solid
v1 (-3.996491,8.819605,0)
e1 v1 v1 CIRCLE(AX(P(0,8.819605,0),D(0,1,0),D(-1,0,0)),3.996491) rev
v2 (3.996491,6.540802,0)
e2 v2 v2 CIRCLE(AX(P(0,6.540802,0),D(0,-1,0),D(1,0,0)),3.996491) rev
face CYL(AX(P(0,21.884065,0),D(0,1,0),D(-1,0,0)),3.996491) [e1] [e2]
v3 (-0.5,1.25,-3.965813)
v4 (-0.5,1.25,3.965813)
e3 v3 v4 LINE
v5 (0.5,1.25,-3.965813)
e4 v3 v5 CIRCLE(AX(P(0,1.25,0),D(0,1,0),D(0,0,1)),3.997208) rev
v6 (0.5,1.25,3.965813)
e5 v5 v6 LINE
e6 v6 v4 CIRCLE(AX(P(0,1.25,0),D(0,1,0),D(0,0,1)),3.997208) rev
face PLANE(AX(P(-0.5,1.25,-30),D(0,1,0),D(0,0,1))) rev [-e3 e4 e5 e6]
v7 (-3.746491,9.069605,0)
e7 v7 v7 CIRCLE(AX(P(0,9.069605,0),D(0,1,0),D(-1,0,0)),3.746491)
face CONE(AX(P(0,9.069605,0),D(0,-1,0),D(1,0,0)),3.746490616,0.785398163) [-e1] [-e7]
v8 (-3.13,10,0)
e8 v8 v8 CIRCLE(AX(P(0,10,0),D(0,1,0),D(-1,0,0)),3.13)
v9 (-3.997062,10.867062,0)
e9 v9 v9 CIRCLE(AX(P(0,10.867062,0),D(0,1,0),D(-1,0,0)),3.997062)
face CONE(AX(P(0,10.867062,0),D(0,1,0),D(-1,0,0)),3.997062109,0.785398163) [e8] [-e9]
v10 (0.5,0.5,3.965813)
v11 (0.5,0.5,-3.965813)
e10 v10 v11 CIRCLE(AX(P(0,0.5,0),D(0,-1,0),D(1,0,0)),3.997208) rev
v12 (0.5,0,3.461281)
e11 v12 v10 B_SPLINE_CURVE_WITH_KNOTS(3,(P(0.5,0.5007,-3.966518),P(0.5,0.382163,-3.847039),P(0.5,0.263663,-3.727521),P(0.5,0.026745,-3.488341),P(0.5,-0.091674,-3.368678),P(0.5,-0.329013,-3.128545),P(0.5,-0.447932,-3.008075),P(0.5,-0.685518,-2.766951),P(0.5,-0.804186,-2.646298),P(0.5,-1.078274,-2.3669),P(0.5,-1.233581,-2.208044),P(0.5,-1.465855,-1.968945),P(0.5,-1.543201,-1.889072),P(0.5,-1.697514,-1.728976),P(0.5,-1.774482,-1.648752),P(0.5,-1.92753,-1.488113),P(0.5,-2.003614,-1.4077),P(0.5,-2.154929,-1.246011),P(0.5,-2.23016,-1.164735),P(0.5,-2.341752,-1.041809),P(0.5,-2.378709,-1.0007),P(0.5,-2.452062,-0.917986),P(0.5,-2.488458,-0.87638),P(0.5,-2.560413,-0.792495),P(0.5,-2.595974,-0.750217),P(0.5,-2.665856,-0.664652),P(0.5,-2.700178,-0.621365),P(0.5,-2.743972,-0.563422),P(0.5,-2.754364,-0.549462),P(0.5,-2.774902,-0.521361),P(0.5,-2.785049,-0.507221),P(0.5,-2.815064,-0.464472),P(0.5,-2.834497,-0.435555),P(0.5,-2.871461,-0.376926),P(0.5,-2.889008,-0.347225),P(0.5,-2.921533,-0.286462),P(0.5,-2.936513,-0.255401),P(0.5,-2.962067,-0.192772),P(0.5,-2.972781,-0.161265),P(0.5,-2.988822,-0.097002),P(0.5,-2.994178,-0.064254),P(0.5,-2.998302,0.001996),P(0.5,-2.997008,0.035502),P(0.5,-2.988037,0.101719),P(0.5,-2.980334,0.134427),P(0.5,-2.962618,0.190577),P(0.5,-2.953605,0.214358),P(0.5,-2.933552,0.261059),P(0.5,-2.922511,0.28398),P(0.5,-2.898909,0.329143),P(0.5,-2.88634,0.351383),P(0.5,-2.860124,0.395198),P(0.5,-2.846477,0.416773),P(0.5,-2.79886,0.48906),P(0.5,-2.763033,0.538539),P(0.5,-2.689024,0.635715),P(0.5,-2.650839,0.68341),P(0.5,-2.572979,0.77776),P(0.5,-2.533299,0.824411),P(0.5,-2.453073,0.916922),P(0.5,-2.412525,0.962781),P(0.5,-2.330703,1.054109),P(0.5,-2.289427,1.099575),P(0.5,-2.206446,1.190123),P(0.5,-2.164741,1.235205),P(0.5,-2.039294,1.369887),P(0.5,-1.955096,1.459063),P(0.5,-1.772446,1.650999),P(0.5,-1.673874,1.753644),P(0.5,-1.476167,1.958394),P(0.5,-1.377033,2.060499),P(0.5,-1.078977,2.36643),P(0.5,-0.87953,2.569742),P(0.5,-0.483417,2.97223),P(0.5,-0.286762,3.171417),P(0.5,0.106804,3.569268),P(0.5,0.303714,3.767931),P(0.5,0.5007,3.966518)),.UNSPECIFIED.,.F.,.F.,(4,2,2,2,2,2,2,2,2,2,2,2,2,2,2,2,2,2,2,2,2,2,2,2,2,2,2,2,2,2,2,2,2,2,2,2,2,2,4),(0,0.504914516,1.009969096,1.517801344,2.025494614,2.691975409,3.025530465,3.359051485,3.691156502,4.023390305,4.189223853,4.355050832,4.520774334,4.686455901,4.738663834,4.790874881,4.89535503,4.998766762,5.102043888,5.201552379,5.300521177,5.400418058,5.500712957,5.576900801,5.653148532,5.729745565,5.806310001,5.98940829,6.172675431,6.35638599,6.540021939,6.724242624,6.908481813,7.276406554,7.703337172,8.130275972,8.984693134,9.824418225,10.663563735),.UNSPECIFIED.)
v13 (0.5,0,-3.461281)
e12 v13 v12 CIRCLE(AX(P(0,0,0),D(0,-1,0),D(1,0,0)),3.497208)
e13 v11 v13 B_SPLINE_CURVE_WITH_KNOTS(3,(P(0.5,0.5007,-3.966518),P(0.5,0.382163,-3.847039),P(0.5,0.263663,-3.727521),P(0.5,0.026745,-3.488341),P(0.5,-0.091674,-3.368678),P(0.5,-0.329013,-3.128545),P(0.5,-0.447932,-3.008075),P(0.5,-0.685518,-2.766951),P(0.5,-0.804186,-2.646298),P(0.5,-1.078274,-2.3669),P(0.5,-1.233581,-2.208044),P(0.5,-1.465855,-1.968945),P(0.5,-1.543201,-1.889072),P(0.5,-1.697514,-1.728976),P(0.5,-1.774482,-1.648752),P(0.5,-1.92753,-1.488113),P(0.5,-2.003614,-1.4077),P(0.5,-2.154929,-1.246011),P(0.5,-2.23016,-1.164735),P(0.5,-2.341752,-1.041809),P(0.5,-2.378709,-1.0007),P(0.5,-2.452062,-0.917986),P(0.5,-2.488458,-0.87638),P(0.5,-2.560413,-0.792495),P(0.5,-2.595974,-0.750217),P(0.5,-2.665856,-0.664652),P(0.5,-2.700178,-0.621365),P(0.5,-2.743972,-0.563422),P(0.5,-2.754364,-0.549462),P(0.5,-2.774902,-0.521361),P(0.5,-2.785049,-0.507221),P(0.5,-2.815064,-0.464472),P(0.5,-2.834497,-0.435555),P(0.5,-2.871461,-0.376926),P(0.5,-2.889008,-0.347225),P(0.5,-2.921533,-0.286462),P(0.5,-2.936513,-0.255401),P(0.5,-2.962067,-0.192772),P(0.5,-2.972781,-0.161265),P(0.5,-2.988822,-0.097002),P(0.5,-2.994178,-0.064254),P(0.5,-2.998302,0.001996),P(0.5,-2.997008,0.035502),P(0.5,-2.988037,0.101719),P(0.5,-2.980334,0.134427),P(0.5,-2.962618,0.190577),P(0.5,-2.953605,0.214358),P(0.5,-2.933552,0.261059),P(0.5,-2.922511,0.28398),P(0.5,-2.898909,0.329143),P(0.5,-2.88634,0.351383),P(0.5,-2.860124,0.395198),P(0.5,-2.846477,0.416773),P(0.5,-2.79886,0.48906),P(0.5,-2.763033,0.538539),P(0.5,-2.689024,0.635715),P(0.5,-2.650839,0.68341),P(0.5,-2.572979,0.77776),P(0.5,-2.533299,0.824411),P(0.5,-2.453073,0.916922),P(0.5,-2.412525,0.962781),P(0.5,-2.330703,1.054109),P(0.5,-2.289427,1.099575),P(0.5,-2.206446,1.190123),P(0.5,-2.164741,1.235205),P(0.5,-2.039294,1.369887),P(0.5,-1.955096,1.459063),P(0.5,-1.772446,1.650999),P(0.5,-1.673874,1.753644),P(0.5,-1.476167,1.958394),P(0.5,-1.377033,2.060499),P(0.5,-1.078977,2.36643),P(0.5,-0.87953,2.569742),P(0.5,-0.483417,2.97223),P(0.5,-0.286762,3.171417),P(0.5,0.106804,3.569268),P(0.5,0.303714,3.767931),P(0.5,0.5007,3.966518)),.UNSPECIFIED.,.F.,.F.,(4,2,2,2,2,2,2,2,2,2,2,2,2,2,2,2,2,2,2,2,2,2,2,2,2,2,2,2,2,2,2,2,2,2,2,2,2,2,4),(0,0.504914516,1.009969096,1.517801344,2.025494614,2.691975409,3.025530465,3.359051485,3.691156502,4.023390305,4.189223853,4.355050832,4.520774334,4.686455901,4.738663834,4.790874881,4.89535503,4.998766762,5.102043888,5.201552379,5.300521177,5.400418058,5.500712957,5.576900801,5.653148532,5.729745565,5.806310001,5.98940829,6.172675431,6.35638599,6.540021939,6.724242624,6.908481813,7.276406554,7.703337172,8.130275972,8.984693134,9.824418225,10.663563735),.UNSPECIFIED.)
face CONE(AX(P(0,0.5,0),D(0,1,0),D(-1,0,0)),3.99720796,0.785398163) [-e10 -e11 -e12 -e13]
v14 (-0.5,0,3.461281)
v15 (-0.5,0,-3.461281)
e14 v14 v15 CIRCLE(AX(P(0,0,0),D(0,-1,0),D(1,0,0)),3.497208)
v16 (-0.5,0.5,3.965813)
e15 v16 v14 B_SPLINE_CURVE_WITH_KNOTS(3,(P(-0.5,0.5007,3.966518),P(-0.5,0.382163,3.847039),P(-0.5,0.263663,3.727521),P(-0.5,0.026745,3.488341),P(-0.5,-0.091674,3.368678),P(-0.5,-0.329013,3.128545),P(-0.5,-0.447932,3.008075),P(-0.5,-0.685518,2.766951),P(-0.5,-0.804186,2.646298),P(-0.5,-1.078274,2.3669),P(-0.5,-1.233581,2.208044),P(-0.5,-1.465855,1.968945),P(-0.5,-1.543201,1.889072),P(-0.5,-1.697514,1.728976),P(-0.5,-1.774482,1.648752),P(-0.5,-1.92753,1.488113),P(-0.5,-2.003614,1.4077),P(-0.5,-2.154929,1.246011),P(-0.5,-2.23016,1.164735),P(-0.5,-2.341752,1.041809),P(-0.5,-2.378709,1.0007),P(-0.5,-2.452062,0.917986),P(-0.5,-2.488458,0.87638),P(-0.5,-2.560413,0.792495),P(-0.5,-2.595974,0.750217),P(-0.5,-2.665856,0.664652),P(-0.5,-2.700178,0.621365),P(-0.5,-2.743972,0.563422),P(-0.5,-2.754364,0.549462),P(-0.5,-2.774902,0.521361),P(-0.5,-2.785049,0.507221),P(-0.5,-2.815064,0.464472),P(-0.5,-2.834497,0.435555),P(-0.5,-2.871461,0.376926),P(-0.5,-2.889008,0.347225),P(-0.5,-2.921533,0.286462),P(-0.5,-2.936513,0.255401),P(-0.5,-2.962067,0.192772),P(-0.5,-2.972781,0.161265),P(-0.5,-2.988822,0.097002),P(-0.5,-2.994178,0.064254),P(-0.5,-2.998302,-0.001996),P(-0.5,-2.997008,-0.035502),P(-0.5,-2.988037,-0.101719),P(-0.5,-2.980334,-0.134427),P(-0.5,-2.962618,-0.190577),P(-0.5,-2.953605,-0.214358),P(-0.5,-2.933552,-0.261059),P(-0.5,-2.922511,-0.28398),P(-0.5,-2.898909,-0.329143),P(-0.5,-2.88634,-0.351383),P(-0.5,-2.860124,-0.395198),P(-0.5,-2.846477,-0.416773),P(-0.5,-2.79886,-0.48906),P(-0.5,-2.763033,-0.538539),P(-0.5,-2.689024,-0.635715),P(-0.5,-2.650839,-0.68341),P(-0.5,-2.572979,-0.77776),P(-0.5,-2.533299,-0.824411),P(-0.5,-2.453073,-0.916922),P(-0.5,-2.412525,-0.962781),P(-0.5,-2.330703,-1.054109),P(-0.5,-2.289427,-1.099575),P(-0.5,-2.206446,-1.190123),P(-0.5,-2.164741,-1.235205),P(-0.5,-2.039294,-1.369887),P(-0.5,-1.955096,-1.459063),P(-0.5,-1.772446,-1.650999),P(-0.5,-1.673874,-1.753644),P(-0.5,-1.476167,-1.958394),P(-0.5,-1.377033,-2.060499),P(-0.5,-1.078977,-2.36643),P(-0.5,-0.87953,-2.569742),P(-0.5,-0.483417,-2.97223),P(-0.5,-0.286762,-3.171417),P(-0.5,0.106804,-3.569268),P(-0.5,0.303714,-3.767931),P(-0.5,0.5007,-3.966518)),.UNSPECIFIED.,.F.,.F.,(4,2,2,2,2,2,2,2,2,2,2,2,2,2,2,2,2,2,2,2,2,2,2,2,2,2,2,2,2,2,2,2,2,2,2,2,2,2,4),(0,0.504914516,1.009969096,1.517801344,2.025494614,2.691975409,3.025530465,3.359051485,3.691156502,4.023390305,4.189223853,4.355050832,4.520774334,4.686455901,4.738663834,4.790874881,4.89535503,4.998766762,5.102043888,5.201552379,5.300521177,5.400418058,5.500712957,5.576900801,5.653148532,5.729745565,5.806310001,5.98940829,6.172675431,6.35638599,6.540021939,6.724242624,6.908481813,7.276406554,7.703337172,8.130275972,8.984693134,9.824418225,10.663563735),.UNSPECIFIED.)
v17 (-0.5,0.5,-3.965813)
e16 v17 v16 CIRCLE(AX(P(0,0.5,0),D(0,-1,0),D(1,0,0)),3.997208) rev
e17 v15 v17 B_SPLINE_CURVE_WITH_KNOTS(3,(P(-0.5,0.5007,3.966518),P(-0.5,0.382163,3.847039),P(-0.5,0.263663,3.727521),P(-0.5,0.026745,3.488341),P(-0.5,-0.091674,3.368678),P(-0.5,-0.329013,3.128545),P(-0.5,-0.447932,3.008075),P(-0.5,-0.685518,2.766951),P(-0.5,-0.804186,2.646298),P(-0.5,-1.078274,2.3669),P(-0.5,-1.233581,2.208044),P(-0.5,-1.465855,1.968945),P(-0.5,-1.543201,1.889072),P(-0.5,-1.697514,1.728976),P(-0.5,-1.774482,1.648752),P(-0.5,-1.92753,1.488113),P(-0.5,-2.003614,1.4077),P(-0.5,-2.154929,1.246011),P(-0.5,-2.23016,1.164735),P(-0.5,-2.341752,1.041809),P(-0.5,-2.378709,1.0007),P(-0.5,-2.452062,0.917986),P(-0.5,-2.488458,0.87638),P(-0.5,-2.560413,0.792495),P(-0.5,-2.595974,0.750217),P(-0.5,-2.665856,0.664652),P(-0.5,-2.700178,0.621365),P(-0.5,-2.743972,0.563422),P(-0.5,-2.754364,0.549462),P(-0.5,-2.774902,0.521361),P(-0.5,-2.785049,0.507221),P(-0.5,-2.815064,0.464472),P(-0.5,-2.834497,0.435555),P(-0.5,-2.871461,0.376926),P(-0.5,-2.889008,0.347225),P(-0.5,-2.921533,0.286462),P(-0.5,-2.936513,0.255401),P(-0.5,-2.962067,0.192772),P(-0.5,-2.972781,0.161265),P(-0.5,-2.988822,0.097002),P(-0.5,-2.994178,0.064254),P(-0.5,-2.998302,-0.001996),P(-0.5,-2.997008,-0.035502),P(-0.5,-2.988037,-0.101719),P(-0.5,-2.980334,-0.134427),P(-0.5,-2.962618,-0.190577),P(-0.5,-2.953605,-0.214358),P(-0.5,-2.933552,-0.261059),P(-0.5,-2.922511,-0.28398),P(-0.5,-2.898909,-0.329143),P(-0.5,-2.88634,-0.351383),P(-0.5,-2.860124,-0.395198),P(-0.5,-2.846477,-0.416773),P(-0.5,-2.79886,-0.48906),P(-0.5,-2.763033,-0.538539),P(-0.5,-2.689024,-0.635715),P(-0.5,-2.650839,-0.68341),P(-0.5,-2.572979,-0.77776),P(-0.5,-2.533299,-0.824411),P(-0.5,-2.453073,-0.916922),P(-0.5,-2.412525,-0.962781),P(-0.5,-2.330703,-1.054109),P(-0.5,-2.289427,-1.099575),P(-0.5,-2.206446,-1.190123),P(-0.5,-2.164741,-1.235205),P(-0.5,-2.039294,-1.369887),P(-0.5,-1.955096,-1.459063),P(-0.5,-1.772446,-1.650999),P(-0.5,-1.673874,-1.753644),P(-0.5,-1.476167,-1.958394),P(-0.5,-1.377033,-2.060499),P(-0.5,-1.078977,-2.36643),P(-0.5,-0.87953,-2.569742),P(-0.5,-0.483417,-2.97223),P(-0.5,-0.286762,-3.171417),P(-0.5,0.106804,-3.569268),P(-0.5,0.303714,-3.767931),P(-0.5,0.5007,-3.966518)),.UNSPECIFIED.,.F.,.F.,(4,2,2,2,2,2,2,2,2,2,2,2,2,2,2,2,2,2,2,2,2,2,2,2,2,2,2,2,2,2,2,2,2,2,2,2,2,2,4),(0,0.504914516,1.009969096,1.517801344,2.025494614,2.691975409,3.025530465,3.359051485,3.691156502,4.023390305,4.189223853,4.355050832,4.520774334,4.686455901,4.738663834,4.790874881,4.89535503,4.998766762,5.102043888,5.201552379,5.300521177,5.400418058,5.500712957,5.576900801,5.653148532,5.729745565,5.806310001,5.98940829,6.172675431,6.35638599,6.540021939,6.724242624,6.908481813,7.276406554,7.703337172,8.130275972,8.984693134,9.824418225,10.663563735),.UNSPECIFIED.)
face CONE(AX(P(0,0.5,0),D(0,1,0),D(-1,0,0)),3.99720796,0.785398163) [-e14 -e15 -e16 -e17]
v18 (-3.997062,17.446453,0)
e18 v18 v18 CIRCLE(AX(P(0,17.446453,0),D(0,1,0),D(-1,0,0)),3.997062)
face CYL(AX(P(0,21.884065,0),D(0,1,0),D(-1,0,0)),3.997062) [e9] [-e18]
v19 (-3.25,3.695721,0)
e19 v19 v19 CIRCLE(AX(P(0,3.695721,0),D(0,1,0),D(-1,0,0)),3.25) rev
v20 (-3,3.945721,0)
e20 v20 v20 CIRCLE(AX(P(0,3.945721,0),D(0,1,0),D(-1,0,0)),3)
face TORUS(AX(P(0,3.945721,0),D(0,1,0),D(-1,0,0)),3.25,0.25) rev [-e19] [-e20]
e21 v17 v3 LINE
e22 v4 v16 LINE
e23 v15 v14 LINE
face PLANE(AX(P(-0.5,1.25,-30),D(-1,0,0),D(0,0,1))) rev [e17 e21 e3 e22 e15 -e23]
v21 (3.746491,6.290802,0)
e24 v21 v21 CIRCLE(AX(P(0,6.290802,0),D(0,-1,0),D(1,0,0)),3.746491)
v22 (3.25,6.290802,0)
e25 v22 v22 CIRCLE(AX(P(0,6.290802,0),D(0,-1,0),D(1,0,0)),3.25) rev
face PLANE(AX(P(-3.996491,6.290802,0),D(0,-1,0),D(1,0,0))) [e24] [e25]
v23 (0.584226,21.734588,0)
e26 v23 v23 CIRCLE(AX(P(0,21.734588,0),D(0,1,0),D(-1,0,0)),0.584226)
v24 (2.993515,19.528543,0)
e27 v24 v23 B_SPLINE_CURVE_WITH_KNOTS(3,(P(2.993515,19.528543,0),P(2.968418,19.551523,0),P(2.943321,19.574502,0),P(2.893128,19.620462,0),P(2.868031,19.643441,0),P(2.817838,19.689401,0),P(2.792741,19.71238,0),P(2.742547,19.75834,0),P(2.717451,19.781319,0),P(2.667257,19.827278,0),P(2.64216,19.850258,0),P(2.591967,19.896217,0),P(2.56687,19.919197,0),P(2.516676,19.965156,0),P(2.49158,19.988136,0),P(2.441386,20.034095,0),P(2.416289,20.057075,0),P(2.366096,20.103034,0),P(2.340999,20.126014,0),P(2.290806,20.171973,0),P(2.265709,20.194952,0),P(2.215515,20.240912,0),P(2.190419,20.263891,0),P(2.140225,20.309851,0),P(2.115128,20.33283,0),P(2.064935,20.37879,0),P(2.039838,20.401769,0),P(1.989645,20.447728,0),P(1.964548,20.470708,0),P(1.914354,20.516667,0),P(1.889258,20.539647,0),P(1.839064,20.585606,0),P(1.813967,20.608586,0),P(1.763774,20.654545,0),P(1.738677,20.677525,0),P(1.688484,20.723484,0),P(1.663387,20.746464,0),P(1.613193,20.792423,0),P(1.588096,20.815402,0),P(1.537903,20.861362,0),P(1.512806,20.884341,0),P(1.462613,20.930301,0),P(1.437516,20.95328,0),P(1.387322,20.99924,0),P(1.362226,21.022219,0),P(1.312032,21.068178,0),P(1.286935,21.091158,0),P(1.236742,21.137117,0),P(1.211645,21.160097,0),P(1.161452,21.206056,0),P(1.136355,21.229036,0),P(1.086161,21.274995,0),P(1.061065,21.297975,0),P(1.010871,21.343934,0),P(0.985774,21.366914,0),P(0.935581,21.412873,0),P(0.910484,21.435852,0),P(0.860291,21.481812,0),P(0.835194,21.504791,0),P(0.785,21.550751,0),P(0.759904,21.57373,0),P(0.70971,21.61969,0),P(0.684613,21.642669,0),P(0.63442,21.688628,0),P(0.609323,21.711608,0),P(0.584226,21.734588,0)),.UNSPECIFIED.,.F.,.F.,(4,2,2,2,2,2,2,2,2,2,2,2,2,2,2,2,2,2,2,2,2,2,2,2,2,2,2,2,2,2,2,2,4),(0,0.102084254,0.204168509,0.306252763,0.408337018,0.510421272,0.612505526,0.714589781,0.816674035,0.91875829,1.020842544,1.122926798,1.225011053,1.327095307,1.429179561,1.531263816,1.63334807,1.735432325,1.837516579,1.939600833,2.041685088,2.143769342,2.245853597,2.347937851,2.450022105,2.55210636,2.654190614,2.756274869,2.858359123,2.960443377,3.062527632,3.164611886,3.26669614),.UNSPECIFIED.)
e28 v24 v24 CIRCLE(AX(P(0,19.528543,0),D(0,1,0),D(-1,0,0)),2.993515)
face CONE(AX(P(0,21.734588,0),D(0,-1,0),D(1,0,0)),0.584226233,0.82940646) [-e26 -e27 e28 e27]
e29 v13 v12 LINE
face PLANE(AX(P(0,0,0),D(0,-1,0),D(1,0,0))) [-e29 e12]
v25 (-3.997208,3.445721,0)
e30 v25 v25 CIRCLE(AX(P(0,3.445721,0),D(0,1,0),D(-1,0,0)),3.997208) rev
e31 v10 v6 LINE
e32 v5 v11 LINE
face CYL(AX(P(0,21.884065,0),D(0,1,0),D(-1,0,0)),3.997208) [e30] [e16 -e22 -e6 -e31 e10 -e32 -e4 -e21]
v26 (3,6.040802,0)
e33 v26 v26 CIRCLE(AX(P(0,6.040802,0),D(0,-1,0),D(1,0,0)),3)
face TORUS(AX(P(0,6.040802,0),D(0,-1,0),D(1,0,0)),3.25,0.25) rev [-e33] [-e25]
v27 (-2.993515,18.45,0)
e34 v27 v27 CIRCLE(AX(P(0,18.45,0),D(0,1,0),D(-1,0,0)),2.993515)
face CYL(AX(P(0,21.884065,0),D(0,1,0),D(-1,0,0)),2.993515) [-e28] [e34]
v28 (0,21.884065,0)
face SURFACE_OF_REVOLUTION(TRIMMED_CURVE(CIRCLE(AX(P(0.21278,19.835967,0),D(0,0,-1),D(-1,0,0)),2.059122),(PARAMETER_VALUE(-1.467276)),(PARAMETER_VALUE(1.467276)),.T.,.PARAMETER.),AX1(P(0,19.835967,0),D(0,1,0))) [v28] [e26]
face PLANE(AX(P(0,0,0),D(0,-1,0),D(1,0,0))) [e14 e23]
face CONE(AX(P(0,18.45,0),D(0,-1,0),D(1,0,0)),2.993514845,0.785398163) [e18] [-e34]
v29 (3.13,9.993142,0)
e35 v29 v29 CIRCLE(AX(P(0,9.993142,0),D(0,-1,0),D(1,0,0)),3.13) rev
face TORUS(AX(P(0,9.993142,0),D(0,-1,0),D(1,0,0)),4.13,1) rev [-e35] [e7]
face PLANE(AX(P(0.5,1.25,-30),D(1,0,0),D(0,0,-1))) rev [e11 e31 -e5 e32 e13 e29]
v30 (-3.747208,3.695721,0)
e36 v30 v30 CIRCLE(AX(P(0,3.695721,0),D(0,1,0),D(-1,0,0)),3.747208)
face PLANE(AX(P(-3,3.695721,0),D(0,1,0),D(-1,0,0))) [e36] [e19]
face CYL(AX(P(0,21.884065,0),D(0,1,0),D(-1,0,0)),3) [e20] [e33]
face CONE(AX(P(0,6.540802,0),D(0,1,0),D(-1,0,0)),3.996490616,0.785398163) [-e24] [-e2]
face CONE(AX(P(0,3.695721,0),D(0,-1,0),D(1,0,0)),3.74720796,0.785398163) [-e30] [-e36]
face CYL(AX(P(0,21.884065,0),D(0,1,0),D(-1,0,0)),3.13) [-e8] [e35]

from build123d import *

# Parameters (mm, degrees)
REDONDEO1_R           = 0.25
CHAFL_N7_SIZE         = 0.25
CHAFL_N9_SIZE         = 0.5
CROQUIS1_W            = 1
CROQUIS1_H            = 1.25
CORTAR_EXTRUIR1_DEPTH = 40
REDONDEO2_R           = 1


with BuildPart() as part:
    # Sketch1 → Revolve1 (revolve)
    with BuildSketch(Plane.XY):
        with BuildLine():
            Line((0, 0), (-3.99720796, 0))
            Line((-3.99720796, 0), (-3.99720796, 3.695721343))
            Line((-3.99720796, 3.695721343), (-3, 3.695721343))
            Line((-3, 3.695721343), (-3, 6.290801943))
            Line((-3, 6.290801943), (-3.996490616, 6.290801943))
            Line((-3.996490616, 6.290801943), (-3.996490616, 9.069605063))
            Line((-3.996490616, 9.069605063), (-3.13, 9.069605063))
            Line((-3.13, 9.069605063), (-3.13, 10))
            Line((-3.13, 10), (-3.997062109, 10.867062109))
            Line((-3.997062109, 10.867062109), (-3.997062109, 17.446452736))
            Line((-3.997062109, 17.446452736), (-2.993514845, 18.45))
            Line((-2.993514845, 18.45), (-2.993514845, 19.528543236))
            Line((-2.993514845, 19.528543236), (-0.584226233, 21.734587674))
            ThreePointArc((-0.584226233, 21.734587674), (-0.297614848, 21.830829517), (0, 21.884064665))
            Line((0, 21.884064665), (0, 0))
        make_face()
    revolve(axis=Axis((0, 21.884064665, 0), (0, -1, 0)))

    # Redondeo1
    redondeo1_edges = [part.edges().sort_by_distance(p)[0] for p in [
        (3, 6.290801943, 0),
        (3, 3.695721343, 0),
    ]]
    fillet(redondeo1_edges, radius=REDONDEO1_R)

    # Chaflán7
    chafl_n7_edges = [part.edges().sort_by_distance(p)[0] for p in [
        (3.996490616, 9.069605063, 0),
        (3.996490616, 6.290801943, 0),
        (3.99720796, 3.695721343, 0),
    ]]
    chamfer(chafl_n7_edges, length=CHAFL_N7_SIZE)

    # Chaflán9
    chafl_n9_edges = [part.edges().sort_by_distance(p)[0] for p in [
        (3.99720796, 0, 0),
    ]]
    chamfer(chafl_n9_edges, length=CHAFL_N9_SIZE)

    # Croquis1 → Cortar-Extruir1 (cut)
    with BuildSketch(Plane.XY.offset(10)):
        with Locations((0, 0.625)):
            Rectangle(CROQUIS1_W, CROQUIS1_H)
    extrude(amount=-CORTAR_EXTRUIR1_DEPTH, mode=Mode.SUBTRACT)

    # Redondeo2
    # the kernel refuses this fillet: 1 mm, written as the material it adds along each edge
    with BuildSketch(Plane(origin=(0, 9.069605063, 0), x_dir=(-1, 0, 0), z_dir=(0, 0, 1))) as redondeo2_piece_1:
        with BuildLine():
            CenterArc((4.13, -0.923536979), REDONDEO2_R, 112.55123215, 67.44876785)
            Line((3.13, -0.923536979), (3.11, -0.923536979))
            Line((3.11, -0.923536979), (3.11, 0))
            Line((3.11, 0), (3.13, 0.02))
            ThreePointArc((3.13, 0.02), (3.438245308, 0.02), (3.738820428, 0.01847074))
            Line((3.738820428, 0.01847074), (3.746490616, 0))
        make_face()
    revolve(axis=Axis((0, 9.069605063, 0), (0, -1, 0)))


solid = part.part
